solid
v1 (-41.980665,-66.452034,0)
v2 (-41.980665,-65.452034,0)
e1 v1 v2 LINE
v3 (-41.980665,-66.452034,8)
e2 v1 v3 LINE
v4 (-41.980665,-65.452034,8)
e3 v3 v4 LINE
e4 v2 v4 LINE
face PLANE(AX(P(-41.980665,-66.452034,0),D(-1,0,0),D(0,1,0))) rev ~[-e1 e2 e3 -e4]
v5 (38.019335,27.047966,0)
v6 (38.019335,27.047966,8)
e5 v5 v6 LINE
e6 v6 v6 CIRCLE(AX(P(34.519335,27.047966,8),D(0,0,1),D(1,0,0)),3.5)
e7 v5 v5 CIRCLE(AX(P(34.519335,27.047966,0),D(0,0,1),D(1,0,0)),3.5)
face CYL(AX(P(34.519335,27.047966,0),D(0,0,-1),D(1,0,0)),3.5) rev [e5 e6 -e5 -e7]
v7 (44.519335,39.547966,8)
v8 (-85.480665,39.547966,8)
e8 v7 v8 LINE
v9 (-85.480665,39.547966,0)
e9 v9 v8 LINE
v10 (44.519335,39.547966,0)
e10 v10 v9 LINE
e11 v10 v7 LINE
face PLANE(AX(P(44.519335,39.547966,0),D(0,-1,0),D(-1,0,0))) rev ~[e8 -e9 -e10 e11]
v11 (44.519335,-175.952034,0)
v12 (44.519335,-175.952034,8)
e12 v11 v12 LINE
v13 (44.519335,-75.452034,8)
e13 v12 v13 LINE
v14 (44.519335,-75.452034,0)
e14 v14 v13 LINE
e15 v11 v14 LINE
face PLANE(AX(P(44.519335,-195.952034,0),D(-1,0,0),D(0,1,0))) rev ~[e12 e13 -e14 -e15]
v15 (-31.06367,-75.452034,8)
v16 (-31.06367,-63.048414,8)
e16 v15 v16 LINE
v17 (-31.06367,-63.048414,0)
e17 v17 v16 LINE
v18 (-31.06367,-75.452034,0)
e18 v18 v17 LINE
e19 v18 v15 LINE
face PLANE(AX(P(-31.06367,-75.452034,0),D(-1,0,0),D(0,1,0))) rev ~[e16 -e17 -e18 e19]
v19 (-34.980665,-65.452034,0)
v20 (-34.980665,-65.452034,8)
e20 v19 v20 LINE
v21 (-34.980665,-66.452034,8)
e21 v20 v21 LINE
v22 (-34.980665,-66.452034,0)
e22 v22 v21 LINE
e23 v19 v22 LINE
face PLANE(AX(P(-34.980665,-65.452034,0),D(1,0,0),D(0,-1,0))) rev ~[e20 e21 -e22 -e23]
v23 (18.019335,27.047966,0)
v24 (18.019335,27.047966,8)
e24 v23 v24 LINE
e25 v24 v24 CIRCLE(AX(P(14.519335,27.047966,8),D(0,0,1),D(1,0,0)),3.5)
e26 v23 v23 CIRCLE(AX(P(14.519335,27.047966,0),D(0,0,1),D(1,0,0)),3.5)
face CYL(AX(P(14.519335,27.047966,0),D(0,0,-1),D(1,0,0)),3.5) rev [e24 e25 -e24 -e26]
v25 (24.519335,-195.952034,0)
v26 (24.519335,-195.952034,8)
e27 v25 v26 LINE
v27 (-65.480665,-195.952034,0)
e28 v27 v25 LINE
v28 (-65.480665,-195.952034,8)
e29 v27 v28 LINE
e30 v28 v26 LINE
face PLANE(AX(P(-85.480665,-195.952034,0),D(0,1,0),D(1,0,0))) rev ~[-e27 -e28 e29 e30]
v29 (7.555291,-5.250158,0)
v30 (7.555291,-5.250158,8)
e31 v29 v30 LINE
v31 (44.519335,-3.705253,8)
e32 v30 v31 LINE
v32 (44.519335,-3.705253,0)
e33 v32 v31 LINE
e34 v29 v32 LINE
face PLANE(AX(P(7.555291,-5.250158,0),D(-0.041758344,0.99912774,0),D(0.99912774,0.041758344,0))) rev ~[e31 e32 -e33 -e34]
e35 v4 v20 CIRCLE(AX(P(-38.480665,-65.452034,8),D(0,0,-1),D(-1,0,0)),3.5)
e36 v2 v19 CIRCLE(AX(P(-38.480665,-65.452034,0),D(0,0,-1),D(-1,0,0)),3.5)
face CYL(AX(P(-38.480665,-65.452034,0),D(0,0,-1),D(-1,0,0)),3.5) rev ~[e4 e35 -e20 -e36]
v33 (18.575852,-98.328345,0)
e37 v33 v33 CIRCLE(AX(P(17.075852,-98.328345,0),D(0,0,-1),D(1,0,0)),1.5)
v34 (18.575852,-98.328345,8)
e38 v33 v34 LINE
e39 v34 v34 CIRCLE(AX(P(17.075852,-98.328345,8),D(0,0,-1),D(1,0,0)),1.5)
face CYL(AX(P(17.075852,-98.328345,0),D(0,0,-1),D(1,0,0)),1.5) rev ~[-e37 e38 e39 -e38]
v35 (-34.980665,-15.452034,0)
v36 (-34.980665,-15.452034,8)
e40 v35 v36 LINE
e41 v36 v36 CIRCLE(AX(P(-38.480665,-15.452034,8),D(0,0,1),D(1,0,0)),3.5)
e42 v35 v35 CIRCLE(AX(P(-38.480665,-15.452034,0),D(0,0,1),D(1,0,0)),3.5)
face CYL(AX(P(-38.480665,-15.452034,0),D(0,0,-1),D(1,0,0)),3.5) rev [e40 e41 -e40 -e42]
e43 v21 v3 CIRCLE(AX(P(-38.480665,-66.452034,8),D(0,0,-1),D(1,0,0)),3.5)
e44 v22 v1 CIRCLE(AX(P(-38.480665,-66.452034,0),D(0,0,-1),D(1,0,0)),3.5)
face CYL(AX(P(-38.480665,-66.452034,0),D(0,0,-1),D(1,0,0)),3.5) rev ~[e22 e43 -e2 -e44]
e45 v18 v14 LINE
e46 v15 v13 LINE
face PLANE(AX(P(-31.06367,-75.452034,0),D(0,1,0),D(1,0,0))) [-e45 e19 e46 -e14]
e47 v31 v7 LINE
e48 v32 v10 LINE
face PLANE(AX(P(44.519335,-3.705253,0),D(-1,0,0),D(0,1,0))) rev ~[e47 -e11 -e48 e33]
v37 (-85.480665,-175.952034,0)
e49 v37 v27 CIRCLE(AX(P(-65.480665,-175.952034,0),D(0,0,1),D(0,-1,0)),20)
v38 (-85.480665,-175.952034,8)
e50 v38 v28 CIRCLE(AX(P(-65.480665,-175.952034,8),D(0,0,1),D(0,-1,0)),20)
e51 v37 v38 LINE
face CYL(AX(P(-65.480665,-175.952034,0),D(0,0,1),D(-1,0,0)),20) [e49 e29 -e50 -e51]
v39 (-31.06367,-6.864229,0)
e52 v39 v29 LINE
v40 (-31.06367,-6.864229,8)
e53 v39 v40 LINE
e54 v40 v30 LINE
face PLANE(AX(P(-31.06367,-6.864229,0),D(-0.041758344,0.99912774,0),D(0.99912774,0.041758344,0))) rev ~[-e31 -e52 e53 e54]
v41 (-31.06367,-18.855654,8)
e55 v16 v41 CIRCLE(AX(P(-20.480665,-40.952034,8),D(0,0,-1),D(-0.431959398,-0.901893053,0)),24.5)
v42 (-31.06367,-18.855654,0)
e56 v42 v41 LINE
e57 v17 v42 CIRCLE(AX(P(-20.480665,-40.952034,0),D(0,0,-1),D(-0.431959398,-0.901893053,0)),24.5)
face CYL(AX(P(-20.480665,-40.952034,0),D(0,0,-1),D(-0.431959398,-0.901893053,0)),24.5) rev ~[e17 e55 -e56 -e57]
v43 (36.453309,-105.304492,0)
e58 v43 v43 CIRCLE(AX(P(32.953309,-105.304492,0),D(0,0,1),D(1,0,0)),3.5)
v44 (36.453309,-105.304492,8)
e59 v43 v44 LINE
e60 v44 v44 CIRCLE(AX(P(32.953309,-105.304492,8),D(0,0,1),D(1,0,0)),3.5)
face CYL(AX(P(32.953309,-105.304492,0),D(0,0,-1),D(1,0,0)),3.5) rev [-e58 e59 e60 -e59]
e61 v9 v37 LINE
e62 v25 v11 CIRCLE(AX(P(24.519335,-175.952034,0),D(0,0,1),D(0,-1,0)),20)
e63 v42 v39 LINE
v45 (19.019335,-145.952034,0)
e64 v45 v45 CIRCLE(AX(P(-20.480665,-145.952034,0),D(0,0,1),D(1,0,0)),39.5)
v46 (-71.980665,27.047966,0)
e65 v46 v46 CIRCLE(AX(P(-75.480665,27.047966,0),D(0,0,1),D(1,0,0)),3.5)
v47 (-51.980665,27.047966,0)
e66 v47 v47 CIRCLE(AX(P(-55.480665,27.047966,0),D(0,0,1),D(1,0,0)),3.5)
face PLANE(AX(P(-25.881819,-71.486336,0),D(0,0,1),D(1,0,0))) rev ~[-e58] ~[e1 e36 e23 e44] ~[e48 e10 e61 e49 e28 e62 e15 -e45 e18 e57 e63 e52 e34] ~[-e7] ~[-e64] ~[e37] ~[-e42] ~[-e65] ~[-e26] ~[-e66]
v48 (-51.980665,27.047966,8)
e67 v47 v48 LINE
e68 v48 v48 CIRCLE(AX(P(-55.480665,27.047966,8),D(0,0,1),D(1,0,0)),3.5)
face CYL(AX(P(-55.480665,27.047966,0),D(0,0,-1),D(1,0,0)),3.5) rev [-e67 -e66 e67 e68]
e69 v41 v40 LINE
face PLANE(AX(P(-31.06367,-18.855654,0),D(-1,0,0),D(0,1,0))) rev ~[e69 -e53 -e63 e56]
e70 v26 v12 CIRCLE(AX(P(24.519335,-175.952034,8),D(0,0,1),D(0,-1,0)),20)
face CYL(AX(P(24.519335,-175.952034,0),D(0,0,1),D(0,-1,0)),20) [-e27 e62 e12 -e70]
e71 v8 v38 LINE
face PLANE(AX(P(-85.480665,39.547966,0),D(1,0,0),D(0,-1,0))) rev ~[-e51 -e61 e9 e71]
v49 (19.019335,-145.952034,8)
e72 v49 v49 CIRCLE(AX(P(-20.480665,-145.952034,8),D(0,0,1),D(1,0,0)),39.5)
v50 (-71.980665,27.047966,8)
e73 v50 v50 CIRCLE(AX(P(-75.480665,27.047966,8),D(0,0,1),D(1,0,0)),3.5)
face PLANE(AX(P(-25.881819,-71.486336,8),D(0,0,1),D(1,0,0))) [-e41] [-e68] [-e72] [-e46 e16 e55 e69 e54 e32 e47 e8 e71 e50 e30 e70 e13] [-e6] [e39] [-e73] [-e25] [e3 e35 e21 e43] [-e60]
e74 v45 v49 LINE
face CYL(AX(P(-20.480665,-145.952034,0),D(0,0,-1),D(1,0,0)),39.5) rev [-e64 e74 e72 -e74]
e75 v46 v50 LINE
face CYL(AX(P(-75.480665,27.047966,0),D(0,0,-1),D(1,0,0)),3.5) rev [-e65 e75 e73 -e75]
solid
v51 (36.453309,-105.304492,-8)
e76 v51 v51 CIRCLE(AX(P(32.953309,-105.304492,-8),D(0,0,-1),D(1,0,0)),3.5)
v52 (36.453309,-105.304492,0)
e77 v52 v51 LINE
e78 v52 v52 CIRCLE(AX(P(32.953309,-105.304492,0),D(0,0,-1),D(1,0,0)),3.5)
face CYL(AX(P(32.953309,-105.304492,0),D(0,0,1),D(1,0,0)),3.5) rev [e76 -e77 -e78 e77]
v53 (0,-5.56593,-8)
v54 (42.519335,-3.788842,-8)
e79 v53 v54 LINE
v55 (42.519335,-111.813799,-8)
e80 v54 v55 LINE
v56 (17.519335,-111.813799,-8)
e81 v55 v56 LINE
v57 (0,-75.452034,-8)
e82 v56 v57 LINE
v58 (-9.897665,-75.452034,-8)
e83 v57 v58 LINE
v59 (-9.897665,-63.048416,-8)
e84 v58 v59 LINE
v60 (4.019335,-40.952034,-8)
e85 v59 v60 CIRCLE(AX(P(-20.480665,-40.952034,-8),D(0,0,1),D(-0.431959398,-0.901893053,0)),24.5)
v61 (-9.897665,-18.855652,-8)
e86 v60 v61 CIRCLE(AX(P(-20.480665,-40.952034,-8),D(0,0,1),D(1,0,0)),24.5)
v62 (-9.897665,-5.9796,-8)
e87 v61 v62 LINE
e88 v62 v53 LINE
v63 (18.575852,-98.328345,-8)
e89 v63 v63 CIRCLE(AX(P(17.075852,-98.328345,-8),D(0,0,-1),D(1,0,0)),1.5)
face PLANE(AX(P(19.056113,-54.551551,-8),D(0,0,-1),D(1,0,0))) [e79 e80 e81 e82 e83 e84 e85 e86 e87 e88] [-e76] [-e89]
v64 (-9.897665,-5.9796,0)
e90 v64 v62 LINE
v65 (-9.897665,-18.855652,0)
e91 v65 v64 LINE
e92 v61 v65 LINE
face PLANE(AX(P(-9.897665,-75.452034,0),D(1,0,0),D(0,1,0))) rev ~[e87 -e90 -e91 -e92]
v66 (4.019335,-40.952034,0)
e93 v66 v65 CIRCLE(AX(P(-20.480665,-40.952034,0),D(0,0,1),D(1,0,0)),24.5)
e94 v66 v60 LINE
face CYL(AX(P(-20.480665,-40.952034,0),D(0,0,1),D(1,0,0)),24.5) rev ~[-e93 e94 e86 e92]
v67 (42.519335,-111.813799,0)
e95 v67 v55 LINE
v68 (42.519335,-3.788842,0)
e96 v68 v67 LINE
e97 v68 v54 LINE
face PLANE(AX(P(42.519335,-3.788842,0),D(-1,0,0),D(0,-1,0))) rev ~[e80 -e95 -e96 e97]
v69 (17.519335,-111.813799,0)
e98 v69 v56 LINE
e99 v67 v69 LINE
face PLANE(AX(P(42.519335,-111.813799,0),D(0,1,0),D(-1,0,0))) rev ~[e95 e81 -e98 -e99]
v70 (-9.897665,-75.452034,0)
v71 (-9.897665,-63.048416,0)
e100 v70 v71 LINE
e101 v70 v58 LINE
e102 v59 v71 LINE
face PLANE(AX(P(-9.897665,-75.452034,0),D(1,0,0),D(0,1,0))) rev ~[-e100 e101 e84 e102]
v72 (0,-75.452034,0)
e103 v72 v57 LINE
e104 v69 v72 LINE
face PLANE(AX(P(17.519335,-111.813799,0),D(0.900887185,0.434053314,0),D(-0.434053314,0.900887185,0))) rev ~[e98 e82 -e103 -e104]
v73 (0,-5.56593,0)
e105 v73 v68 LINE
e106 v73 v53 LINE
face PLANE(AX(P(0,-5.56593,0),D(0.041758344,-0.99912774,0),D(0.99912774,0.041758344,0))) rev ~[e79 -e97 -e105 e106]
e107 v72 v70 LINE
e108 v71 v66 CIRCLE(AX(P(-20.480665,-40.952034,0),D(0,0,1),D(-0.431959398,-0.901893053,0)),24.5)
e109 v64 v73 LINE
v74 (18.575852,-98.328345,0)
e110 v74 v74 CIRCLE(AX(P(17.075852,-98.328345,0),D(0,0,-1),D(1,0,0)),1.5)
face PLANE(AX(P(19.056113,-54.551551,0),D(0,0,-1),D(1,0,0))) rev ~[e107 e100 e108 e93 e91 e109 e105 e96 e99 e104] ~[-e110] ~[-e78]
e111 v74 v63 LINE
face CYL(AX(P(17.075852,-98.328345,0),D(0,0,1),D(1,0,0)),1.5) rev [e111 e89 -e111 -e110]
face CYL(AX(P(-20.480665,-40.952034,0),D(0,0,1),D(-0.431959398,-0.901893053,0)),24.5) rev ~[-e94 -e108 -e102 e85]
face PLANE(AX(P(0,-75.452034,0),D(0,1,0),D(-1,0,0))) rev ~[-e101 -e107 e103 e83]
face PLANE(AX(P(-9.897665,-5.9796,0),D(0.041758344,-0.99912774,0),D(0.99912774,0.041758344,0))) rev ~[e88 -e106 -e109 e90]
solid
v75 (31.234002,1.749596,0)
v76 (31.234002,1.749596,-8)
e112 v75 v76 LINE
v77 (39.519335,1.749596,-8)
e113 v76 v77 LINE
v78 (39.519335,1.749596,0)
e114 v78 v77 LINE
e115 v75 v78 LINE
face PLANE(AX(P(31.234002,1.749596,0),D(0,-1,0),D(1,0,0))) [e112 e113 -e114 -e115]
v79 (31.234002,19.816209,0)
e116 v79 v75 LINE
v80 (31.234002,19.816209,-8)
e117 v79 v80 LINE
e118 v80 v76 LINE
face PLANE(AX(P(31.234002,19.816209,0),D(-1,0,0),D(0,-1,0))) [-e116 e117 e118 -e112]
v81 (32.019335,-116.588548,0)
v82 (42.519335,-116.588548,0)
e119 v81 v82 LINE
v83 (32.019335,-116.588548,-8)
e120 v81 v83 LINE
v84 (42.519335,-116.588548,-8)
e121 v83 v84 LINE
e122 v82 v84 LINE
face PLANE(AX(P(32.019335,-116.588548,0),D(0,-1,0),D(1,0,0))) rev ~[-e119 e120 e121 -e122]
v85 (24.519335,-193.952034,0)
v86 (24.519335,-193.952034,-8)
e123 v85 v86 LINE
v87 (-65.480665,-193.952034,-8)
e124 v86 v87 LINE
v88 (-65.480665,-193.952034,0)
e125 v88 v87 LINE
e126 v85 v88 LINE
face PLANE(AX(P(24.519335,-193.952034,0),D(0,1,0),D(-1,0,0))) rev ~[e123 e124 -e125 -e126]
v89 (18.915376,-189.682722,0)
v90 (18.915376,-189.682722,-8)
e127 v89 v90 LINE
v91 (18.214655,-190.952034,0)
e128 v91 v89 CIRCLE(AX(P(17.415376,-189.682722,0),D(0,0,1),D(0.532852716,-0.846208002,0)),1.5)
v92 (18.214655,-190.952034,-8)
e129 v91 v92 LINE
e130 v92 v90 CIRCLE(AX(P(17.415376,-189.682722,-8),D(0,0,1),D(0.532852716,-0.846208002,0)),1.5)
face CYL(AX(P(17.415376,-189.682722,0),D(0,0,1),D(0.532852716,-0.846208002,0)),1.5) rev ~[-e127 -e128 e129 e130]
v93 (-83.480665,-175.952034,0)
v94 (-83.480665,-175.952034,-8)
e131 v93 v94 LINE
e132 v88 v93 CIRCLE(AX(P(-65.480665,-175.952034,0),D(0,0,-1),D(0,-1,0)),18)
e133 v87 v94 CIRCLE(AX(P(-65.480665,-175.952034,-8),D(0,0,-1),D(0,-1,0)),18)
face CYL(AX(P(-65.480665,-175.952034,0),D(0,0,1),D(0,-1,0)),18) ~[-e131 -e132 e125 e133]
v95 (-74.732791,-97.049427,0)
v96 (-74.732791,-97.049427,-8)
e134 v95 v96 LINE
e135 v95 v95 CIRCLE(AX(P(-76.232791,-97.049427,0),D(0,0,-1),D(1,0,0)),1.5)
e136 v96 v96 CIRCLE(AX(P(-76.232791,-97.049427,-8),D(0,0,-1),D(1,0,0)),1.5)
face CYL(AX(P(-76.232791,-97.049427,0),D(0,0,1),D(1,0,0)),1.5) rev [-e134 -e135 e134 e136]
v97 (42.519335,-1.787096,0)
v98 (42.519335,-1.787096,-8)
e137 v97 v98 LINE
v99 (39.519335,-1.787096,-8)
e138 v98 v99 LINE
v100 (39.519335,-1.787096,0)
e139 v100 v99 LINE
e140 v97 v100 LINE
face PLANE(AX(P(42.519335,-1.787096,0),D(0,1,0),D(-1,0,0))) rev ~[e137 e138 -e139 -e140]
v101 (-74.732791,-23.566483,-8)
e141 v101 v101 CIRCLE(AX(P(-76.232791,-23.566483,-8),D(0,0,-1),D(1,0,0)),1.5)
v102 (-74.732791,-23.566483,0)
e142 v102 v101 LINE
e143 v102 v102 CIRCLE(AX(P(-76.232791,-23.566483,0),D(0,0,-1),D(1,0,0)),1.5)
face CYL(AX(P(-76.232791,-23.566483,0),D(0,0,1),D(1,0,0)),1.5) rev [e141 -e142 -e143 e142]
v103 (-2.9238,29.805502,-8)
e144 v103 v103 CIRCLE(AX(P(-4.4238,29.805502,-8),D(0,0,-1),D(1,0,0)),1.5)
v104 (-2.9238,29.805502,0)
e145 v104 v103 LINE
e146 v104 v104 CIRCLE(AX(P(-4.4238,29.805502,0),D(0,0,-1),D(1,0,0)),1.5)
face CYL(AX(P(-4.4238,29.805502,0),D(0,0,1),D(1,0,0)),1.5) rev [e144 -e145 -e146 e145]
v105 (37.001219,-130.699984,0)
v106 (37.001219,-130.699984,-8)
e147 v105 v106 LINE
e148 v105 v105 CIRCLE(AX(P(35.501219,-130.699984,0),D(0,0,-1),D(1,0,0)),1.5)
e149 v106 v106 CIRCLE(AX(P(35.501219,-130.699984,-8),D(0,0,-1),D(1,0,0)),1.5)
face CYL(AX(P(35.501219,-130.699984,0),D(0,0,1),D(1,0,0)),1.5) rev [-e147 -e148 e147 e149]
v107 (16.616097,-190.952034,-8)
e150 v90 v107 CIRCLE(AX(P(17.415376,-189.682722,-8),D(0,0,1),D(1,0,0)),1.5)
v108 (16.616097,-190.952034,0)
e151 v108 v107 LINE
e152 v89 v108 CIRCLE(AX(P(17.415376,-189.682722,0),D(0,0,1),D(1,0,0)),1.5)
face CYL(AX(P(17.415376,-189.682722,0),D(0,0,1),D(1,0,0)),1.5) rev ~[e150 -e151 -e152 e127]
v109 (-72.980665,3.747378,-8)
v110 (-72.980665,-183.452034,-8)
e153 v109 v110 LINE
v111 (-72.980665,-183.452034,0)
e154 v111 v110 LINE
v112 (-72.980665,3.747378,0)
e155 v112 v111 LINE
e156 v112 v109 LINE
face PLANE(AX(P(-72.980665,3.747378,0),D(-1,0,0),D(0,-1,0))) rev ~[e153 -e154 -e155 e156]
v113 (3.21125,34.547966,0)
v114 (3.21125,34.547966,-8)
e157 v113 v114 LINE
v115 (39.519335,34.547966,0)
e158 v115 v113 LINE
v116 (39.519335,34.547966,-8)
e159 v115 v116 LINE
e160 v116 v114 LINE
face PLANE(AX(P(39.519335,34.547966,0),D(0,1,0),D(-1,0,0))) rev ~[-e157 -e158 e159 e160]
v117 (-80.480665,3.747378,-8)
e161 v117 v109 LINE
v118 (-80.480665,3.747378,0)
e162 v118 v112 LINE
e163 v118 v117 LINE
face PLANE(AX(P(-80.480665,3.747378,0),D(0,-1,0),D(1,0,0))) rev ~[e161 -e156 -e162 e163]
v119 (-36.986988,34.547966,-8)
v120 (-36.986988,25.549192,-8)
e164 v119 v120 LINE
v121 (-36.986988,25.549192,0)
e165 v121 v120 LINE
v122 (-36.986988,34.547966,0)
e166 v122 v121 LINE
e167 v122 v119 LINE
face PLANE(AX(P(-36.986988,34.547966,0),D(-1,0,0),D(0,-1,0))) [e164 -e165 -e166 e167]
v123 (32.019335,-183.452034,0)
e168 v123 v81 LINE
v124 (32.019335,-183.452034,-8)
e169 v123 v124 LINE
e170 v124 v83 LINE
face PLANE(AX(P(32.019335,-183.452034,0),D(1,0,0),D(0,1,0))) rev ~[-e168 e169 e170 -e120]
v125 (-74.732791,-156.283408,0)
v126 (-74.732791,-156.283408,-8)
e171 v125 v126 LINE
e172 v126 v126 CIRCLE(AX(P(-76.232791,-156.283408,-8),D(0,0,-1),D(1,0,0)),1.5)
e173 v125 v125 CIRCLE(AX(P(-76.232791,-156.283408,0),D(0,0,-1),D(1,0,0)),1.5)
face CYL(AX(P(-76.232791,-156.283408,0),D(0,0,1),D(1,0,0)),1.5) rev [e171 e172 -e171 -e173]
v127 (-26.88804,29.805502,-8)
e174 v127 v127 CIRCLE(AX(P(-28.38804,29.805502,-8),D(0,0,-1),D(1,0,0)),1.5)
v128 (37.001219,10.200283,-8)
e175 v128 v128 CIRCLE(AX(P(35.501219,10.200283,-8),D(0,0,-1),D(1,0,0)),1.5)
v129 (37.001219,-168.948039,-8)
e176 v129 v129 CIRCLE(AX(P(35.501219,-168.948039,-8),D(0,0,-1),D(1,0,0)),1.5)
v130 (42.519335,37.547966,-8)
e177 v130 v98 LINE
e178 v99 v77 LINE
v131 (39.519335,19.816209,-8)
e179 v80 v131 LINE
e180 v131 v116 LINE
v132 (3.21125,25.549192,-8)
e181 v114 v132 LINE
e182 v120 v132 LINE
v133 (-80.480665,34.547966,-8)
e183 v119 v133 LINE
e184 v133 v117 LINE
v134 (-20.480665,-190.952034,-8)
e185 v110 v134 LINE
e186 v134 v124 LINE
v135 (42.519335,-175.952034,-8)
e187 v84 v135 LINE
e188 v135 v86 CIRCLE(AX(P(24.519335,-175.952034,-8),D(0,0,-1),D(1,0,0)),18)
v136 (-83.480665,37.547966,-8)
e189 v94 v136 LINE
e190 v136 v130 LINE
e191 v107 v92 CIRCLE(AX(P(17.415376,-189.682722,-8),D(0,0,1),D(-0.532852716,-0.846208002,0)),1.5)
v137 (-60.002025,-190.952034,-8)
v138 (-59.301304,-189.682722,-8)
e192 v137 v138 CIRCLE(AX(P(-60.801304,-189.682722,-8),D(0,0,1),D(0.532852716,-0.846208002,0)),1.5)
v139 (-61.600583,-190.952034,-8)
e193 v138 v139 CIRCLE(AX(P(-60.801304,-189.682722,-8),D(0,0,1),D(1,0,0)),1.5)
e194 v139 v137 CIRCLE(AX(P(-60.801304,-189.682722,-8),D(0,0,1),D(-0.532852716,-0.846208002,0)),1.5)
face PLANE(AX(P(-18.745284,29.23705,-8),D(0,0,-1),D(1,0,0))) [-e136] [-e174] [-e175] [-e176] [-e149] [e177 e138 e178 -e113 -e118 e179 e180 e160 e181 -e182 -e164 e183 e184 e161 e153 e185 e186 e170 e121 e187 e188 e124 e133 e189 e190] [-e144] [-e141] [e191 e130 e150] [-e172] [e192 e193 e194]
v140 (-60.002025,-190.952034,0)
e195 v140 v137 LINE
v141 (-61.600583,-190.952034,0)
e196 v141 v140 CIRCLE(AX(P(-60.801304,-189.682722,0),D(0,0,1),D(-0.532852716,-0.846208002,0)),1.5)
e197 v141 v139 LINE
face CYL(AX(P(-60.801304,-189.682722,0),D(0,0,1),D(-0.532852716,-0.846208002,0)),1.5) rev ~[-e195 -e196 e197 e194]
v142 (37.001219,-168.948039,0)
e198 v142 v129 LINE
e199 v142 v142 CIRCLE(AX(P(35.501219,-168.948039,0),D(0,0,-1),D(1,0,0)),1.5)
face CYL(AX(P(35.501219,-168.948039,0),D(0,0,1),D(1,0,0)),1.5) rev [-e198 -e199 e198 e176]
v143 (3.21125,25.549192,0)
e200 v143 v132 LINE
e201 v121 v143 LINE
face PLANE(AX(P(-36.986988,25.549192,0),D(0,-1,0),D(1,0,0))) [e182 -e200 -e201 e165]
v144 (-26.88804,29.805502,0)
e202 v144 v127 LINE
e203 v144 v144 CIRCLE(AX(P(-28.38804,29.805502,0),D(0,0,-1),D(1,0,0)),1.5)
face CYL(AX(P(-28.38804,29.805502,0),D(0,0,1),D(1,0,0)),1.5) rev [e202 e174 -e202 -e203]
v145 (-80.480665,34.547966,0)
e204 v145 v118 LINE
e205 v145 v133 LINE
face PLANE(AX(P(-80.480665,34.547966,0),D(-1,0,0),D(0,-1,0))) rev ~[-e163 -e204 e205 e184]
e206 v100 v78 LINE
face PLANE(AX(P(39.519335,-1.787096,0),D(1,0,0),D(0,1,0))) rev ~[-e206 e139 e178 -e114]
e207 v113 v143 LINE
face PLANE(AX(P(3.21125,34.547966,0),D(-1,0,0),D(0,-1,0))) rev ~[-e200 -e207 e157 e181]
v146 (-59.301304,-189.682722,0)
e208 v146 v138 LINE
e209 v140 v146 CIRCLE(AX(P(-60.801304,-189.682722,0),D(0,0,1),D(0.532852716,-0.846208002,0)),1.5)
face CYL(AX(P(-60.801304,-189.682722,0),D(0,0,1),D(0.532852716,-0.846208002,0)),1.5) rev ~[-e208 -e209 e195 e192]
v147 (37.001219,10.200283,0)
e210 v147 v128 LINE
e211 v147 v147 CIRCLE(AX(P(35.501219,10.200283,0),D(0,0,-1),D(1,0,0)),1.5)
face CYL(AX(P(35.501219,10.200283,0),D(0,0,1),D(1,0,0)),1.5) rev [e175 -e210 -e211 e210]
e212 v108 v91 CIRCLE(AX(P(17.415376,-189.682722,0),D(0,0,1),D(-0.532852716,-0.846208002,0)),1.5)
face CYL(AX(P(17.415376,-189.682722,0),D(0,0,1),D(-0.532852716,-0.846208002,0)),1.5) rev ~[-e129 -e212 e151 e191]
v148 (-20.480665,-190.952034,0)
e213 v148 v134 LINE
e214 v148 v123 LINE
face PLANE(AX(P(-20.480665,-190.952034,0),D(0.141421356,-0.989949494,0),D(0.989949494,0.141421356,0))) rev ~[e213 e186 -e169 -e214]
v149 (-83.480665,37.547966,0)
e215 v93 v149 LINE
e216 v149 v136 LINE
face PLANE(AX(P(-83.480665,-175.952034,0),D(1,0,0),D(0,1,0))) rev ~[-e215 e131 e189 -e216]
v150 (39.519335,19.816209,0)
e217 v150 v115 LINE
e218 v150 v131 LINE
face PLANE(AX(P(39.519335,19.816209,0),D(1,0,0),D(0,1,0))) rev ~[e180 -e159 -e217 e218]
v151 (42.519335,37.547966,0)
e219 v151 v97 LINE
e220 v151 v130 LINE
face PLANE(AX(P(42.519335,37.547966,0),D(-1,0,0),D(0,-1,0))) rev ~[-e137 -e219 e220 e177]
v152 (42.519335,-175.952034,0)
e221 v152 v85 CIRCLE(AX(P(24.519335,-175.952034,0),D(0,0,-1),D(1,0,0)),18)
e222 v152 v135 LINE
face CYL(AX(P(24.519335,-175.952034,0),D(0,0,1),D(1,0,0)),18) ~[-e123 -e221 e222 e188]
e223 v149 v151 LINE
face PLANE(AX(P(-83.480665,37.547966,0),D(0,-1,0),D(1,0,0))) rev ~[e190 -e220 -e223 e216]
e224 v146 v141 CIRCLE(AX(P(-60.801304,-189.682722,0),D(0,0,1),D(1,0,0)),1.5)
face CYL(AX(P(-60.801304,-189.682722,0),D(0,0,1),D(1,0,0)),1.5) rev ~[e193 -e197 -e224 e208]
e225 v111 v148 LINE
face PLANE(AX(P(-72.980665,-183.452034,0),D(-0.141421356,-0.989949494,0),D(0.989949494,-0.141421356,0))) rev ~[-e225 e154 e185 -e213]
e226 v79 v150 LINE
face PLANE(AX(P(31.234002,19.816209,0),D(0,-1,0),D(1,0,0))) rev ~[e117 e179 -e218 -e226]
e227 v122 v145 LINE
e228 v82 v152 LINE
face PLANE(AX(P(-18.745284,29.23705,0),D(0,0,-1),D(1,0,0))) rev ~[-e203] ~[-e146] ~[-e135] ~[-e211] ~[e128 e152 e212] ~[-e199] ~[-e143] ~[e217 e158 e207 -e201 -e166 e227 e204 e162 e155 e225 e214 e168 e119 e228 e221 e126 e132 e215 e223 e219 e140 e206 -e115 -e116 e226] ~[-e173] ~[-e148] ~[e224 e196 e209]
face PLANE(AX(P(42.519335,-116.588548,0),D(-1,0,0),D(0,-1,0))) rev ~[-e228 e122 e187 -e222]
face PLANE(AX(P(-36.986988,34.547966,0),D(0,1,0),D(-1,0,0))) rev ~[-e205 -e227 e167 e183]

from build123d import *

# Parameters (mm, degrees)
F0_R     = 39.5
F0_R_2   = 3.5
F0_W     = 75.5830052443
F0_H     = 21
F1_DEPTH = 8
F2_R     = 20
F3_R     = 1.5
F3_W     = 40.198237868
F3_H     = 8.9987739231
F3_W_2   = 8.2853332109
F3_H_2   = 18.0666130036
F4_DEPTH = 8
F5_R     = 1.5
F6_DEPTH = 25
F5_R_2   = 3.5
F7_DEPTH = 8
F8_DEPTH = 25


# Not quite as in the source:
# - a feature names something its author has since deleted; it is built from what else it names


with BuildPart() as f1:
    # F0 (on Top) → F1 (new body)
    with BuildSketch(Plane.XY):
        with BuildLine():
            Line((44.5193349518, 39.5479659047), (-85.4806650482, 39.5479659047))
            Line((-85.4806650482, 39.5479659047), (-85.4806650482, -95.9520340953))
            Line((-85.4806650482, -95.9520340953), (-85.4806650482, -195.9520340953))
            Line((-85.4806650482, -195.9520340953), (44.5193349518, -195.9520340953))
            Line((44.5193349518, -195.9520340953), (44.5193349518, -96.4520340953))
            Line((44.5193349518, -96.4520340953), (-31.0636702925, -96.4520340953))
            Line((-31.0636702925, -96.4520340953), (-31.0636702925, -75.4520340953))
            Line((-31.0636702925, -75.4520340953), (-31.0636702925, -63.0484138893))
            ThreePointArc((-31.0636702925, -63.0484138893), (-44.9806650482, -40.9520340953), (-31.0636702925, -18.8556543013))
            Line((-31.0636702925, -18.8556543013), (-31.0636702925, -6.8642294387))
            Line((-31.0636702925, -6.8642294387), (-31.0636702925, 14.5479659047))
            Line((-31.0636702925, 14.5479659047), (6.7278323296, 14.5479659047))
            Line((6.7278323296, 14.5479659047), (44.5193349518, 14.5479659047))
            Line((44.5193349518, 14.5479659047), (44.5193349518, 39.5479659047))
        make_face()
        with Locations((-20.4806650482, -145.9520340953)):
            Circle(F0_R, mode=Mode.SUBTRACT)
        with Locations((32.9533093033, -105.3044921878)):
            Circle(F0_R_2, mode=Mode.SUBTRACT)
        with BuildLine():
            ThreePointArc((-34.9806650482, -66.4520340953), (-38.4806650482, -69.9520340953), (-41.9806650482, -66.4520340953))
            Line((-41.9806650482, -66.4520340953), (-41.9806650482, -65.4520340953))
            ThreePointArc((-41.9806650482, -65.4520340953), (-38.4806650482, -61.9520340953), (-34.9806650482, -65.4520340953))
            Line((-34.9806650482, -65.4520340953), (-34.9806650482, -66.4520340953))
        make_face(mode=Mode.SUBTRACT)
        with Locations((-75.4806650482, 27.0479659047)):
            Circle(F0_R_2, mode=Mode.SUBTRACT)
        with Locations((-55.4806650482, 27.0479659047)):
            Circle(F0_R_2, mode=Mode.SUBTRACT)
        with Locations((-38.4806650482, -15.4520340953)):
            Circle(F0_R_2, mode=Mode.SUBTRACT)
        with Locations((14.5193349518, 27.0479659047)):
            Circle(F0_R_2, mode=Mode.SUBTRACT)
        with Locations((34.5193349518, 27.0479659047)):
            Circle(F0_R_2, mode=Mode.SUBTRACT)
        with Locations((6.7278323296, -85.9520340953)):
            Rectangle(F0_W, F0_H)
        Polygon((44.5193349518, -3.7052528509), (44.5193349518, 14.5479659047), (6.7278323296, 14.5479659047), (7.5552909452, -5.2501576775), align=None)
        Polygon((7.5552909452, -5.2501576775), (6.7278323296, 14.5479659047), (-31.0636702925, 14.5479659047), (-31.0636702925, -6.8642294387), align=None)
    extrude(amount=F1_DEPTH)

    # F2
    f2_edges = [f1.edges().sort_by_distance(p)[0] for p in [
        (-85.480665, -195.952034, 4),
        (44.519335, -195.952034, 4),
    ]]
    fillet(f2_edges, radius=F2_R)

    # F5 (on face) → F6 (cut)
    with BuildSketch(Plane(origin=(0, 0, 0), x_dir=(1, 0, 0), z_dir=(0, 0, -1))):
        with Locations((17.0758515596, 98.3283445239)):
            Circle(F5_R)
    extrude(amount=-F6_DEPTH, mode=Mode.SUBTRACT)


with BuildPart() as f4:
    # F3 (on face) → F4 (new body)
    with BuildSketch(Plane(origin=(0, 0, 0), x_dir=(1, 0, 0), z_dir=(0, 0, -1))):
        Polygon((39.5193349518, -29.7293737531), (39.5193349518, -34.5479659047), (34.0944491327, -34.5479659047), (3.2112498302, -34.5479659047), (-36.9869880378, -34.5479659047), (-73.1572136283, -34.5479659047), (-80.4806650482, -34.5479659047), (-80.4806650482, -29.9261137843), (-80.4806650482, -3.7473780103), (-83.4806650482, -3.7473780103), (-83.4806650482, -37.5479659047), (42.5193349518, -37.5479659047), (42.5193349518, 1.7870964078), (39.5193349518, 1.7870964078), (39.5193349518, -1.7495956272), (39.5193349518, -19.8162086308), align=None)
        with BuildLine():
            Line((-83.4806650482, -3.7473780103), (-80.4806650482, -3.7473780103))
            Line((-80.4806650482, -3.7473780103), (-80.4806650482, 175.9520340953))
            ThreePointArc((-80.4806650482, 175.9520340953), (-76.087266766, 186.5586358131), (-65.4806650482, 190.9520340953))
            Line((-65.4806650482, 190.9520340953), (-61.6005832804, 190.9520340953))
            ThreePointArc((-61.6005832804, 190.9520340953), (-60.8013042068, 191.1827220917), (-60.0020251332, 190.9520340953))
            Line((-60.0020251332, 190.9520340953), (-20.4806650482, 190.9520340953))
            Line((-20.4806650482, 190.9520340953), (16.6160973065, 190.9520340953))
            ThreePointArc((16.6160973065, 190.9520340953), (17.4153763801, 191.1827220917), (18.2146554537, 190.9520340953))
            Line((18.2146554537, 190.9520340953), (24.5193349518, 190.9520340953))
            ThreePointArc((24.5193349518, 190.9520340953), (35.1259366696, 186.5586358131), (39.5193349518, 175.9520340953))
            Line((39.5193349518, 175.9520340953), (39.5193349518, 116.5885478258))
            Line((39.5193349518, 116.5885478258), (42.5193349518, 116.5885478258))
            Line((42.5193349518, 116.5885478258), (42.5193349518, 175.9520340953))
            ThreePointArc((42.5193349518, 175.9520340953), (37.2472570131, 188.6799561567), (24.5193349518, 193.9520340953))
            Line((24.5193349518, 193.9520340953), (-65.4806650482, 193.9520340953))
            ThreePointArc((-65.4806650482, 193.9520340953), (-78.2085871096, 188.6799561567), (-83.4806650482, 175.9520340953))
            Line((-83.4806650482, 175.9520340953), (-83.4806650482, -3.7473780103))
        make_face()
        with BuildLine():
            Line((24.5193349518, 190.9520340953), (32.0193349518, 183.4520340953))
            Line((32.0193349518, 183.4520340953), (39.5193349518, 175.9520340953))
            ThreePointArc((39.5193349518, 175.9520340953), (35.1259366696, 186.5586358131), (24.5193349518, 190.9520340953))
        make_face()
        with BuildLine():
            Line((16.6160973065, 190.9520340953), (-20.4806650482, 190.9520340953))
            Line((-20.4806650482, 190.9520340953), (32.0193349518, 183.4520340953))
            Line((32.0193349518, 183.4520340953), (24.5193349518, 190.9520340953))
            Line((24.5193349518, 190.9520340953), (18.2146554537, 190.9520340953))
            ThreePointArc((18.2146554537, 190.9520340953), (18.7285630786, 190.4076639478), (18.9153763801, 189.6827220917))
            ThreePointArc((18.9153763801, 189.6827220917), (16.6904345239, 188.3695353932), (16.6160973065, 190.9520340953))
        make_face()
        Polygon((39.5193349518, 175.9520340953), (32.0193349518, 183.4520340953), (32.0193349518, 116.5885478258), (39.5193349518, 116.5885478258), align=None)
        with Locations((35.5012193322, 130.6999841353)):
            Circle(F3_R, mode=Mode.SUBTRACT)
        with Locations((35.5012193322, 168.9480393119)):
            Circle(F3_R, mode=Mode.SUBTRACT)
        with BuildLine():
            ThreePointArc((-65.4806650482, 190.9520340953), (-76.087266766, 186.5586358131), (-80.4806650482, 175.9520340953))
            Line((-80.4806650482, 175.9520340953), (-72.9806650482, 183.4520340953))
            Line((-72.9806650482, 183.4520340953), (-65.4806650482, 190.9520340953))
        make_face()
        Polygon((-80.4806650482, 175.9520340953), (-80.4806650482, -3.7473780103), (-72.9806650482, -3.7473780103), (-72.9806650482, 183.4520340953), align=None)
        with Locations((-76.232790947, 23.5664832836)):
            Circle(F3_R, mode=Mode.SUBTRACT)
        with Locations((-76.232790947, 97.0494272842)):
            Circle(F3_R, mode=Mode.SUBTRACT)
        with Locations((-76.232790947, 156.2834084034)):
            Circle(F3_R, mode=Mode.SUBTRACT)
        with Locations((-16.8878691038, -30.0485789431)):
            Rectangle(F3_W, F3_H)
        with Locations((-28.3880401403, -29.805501923)):
            Circle(F3_R, mode=Mode.SUBTRACT)
        with Locations((-4.4237997708, -29.805501923)):
            Circle(F3_R, mode=Mode.SUBTRACT)
        with BuildLine():
            Line((-61.6005832804, 190.9520340953), (-65.4806650482, 190.9520340953))
            Line((-65.4806650482, 190.9520340953), (-72.9806650482, 183.4520340953))
            Line((-72.9806650482, 183.4520340953), (-20.4806650482, 190.9520340953))
            Line((-20.4806650482, 190.9520340953), (-60.0020251332, 190.9520340953))
            ThreePointArc((-60.0020251332, 190.9520340953), (-59.4881175083, 190.4076639478), (-59.3013042068, 189.6827220917))
            ThreePointArc((-59.3013042068, 189.6827220917), (-61.5262460629, 188.3695353932), (-61.6005832804, 190.9520340953))
        make_face()
        with Locations((35.3766683463, -10.782902129)):
            Rectangle(F3_W_2, F3_H_2)
        with Locations((35.5012193322, -10.2002834901)):
            Circle(F3_R, mode=Mode.SUBTRACT)
    extrude(amount=F4_DEPTH)


with BuildPart() as f7:
    # F5 (on face) → F7 (new body)
    with BuildSketch(Plane(origin=(0, 0, 0), x_dir=(1, 0, 0), z_dir=(0, 0, -1))):
        Polygon((42.5193349518, 3.788842451), (42.5193349518, 111.8137985468), (17.5193349518, 111.8137985468), (0, 75.4520340953), (-9.8976650482, 75.4520340953), (-9.8976650482, 5.9796004827), (0, 5.5659295515), align=None)
        with Locations((17.0758515596, 98.3283445239)):
            Circle(F5_R, mode=Mode.SUBTRACT)
        with Locations((32.9533093033, 105.3044921878)):
            Circle(F5_R_2, mode=Mode.SUBTRACT)
    extrude(amount=F7_DEPTH)

    # F0 (on Top) → F8 (cut)
    with BuildSketch(Plane.XY):
        with BuildLine():
            ThreePointArc((4.0193349518, -40.9520340953), (-7.4237440575, -20.2212161124), (-31.0636702925, -18.8556543013))
            Line((-31.0636702925, -18.8556543013), (-31.0636702925, -63.0484138893))
            ThreePointArc((-31.0636702925, -63.0484138893), (-7.4237440575, -61.6828520783), (4.0193349518, -40.9520340953))
        make_face()
    extrude(amount=-F8_DEPTH, mode=Mode.SUBTRACT)


solid = Compound([f1.part, f4.part, f7.part])
